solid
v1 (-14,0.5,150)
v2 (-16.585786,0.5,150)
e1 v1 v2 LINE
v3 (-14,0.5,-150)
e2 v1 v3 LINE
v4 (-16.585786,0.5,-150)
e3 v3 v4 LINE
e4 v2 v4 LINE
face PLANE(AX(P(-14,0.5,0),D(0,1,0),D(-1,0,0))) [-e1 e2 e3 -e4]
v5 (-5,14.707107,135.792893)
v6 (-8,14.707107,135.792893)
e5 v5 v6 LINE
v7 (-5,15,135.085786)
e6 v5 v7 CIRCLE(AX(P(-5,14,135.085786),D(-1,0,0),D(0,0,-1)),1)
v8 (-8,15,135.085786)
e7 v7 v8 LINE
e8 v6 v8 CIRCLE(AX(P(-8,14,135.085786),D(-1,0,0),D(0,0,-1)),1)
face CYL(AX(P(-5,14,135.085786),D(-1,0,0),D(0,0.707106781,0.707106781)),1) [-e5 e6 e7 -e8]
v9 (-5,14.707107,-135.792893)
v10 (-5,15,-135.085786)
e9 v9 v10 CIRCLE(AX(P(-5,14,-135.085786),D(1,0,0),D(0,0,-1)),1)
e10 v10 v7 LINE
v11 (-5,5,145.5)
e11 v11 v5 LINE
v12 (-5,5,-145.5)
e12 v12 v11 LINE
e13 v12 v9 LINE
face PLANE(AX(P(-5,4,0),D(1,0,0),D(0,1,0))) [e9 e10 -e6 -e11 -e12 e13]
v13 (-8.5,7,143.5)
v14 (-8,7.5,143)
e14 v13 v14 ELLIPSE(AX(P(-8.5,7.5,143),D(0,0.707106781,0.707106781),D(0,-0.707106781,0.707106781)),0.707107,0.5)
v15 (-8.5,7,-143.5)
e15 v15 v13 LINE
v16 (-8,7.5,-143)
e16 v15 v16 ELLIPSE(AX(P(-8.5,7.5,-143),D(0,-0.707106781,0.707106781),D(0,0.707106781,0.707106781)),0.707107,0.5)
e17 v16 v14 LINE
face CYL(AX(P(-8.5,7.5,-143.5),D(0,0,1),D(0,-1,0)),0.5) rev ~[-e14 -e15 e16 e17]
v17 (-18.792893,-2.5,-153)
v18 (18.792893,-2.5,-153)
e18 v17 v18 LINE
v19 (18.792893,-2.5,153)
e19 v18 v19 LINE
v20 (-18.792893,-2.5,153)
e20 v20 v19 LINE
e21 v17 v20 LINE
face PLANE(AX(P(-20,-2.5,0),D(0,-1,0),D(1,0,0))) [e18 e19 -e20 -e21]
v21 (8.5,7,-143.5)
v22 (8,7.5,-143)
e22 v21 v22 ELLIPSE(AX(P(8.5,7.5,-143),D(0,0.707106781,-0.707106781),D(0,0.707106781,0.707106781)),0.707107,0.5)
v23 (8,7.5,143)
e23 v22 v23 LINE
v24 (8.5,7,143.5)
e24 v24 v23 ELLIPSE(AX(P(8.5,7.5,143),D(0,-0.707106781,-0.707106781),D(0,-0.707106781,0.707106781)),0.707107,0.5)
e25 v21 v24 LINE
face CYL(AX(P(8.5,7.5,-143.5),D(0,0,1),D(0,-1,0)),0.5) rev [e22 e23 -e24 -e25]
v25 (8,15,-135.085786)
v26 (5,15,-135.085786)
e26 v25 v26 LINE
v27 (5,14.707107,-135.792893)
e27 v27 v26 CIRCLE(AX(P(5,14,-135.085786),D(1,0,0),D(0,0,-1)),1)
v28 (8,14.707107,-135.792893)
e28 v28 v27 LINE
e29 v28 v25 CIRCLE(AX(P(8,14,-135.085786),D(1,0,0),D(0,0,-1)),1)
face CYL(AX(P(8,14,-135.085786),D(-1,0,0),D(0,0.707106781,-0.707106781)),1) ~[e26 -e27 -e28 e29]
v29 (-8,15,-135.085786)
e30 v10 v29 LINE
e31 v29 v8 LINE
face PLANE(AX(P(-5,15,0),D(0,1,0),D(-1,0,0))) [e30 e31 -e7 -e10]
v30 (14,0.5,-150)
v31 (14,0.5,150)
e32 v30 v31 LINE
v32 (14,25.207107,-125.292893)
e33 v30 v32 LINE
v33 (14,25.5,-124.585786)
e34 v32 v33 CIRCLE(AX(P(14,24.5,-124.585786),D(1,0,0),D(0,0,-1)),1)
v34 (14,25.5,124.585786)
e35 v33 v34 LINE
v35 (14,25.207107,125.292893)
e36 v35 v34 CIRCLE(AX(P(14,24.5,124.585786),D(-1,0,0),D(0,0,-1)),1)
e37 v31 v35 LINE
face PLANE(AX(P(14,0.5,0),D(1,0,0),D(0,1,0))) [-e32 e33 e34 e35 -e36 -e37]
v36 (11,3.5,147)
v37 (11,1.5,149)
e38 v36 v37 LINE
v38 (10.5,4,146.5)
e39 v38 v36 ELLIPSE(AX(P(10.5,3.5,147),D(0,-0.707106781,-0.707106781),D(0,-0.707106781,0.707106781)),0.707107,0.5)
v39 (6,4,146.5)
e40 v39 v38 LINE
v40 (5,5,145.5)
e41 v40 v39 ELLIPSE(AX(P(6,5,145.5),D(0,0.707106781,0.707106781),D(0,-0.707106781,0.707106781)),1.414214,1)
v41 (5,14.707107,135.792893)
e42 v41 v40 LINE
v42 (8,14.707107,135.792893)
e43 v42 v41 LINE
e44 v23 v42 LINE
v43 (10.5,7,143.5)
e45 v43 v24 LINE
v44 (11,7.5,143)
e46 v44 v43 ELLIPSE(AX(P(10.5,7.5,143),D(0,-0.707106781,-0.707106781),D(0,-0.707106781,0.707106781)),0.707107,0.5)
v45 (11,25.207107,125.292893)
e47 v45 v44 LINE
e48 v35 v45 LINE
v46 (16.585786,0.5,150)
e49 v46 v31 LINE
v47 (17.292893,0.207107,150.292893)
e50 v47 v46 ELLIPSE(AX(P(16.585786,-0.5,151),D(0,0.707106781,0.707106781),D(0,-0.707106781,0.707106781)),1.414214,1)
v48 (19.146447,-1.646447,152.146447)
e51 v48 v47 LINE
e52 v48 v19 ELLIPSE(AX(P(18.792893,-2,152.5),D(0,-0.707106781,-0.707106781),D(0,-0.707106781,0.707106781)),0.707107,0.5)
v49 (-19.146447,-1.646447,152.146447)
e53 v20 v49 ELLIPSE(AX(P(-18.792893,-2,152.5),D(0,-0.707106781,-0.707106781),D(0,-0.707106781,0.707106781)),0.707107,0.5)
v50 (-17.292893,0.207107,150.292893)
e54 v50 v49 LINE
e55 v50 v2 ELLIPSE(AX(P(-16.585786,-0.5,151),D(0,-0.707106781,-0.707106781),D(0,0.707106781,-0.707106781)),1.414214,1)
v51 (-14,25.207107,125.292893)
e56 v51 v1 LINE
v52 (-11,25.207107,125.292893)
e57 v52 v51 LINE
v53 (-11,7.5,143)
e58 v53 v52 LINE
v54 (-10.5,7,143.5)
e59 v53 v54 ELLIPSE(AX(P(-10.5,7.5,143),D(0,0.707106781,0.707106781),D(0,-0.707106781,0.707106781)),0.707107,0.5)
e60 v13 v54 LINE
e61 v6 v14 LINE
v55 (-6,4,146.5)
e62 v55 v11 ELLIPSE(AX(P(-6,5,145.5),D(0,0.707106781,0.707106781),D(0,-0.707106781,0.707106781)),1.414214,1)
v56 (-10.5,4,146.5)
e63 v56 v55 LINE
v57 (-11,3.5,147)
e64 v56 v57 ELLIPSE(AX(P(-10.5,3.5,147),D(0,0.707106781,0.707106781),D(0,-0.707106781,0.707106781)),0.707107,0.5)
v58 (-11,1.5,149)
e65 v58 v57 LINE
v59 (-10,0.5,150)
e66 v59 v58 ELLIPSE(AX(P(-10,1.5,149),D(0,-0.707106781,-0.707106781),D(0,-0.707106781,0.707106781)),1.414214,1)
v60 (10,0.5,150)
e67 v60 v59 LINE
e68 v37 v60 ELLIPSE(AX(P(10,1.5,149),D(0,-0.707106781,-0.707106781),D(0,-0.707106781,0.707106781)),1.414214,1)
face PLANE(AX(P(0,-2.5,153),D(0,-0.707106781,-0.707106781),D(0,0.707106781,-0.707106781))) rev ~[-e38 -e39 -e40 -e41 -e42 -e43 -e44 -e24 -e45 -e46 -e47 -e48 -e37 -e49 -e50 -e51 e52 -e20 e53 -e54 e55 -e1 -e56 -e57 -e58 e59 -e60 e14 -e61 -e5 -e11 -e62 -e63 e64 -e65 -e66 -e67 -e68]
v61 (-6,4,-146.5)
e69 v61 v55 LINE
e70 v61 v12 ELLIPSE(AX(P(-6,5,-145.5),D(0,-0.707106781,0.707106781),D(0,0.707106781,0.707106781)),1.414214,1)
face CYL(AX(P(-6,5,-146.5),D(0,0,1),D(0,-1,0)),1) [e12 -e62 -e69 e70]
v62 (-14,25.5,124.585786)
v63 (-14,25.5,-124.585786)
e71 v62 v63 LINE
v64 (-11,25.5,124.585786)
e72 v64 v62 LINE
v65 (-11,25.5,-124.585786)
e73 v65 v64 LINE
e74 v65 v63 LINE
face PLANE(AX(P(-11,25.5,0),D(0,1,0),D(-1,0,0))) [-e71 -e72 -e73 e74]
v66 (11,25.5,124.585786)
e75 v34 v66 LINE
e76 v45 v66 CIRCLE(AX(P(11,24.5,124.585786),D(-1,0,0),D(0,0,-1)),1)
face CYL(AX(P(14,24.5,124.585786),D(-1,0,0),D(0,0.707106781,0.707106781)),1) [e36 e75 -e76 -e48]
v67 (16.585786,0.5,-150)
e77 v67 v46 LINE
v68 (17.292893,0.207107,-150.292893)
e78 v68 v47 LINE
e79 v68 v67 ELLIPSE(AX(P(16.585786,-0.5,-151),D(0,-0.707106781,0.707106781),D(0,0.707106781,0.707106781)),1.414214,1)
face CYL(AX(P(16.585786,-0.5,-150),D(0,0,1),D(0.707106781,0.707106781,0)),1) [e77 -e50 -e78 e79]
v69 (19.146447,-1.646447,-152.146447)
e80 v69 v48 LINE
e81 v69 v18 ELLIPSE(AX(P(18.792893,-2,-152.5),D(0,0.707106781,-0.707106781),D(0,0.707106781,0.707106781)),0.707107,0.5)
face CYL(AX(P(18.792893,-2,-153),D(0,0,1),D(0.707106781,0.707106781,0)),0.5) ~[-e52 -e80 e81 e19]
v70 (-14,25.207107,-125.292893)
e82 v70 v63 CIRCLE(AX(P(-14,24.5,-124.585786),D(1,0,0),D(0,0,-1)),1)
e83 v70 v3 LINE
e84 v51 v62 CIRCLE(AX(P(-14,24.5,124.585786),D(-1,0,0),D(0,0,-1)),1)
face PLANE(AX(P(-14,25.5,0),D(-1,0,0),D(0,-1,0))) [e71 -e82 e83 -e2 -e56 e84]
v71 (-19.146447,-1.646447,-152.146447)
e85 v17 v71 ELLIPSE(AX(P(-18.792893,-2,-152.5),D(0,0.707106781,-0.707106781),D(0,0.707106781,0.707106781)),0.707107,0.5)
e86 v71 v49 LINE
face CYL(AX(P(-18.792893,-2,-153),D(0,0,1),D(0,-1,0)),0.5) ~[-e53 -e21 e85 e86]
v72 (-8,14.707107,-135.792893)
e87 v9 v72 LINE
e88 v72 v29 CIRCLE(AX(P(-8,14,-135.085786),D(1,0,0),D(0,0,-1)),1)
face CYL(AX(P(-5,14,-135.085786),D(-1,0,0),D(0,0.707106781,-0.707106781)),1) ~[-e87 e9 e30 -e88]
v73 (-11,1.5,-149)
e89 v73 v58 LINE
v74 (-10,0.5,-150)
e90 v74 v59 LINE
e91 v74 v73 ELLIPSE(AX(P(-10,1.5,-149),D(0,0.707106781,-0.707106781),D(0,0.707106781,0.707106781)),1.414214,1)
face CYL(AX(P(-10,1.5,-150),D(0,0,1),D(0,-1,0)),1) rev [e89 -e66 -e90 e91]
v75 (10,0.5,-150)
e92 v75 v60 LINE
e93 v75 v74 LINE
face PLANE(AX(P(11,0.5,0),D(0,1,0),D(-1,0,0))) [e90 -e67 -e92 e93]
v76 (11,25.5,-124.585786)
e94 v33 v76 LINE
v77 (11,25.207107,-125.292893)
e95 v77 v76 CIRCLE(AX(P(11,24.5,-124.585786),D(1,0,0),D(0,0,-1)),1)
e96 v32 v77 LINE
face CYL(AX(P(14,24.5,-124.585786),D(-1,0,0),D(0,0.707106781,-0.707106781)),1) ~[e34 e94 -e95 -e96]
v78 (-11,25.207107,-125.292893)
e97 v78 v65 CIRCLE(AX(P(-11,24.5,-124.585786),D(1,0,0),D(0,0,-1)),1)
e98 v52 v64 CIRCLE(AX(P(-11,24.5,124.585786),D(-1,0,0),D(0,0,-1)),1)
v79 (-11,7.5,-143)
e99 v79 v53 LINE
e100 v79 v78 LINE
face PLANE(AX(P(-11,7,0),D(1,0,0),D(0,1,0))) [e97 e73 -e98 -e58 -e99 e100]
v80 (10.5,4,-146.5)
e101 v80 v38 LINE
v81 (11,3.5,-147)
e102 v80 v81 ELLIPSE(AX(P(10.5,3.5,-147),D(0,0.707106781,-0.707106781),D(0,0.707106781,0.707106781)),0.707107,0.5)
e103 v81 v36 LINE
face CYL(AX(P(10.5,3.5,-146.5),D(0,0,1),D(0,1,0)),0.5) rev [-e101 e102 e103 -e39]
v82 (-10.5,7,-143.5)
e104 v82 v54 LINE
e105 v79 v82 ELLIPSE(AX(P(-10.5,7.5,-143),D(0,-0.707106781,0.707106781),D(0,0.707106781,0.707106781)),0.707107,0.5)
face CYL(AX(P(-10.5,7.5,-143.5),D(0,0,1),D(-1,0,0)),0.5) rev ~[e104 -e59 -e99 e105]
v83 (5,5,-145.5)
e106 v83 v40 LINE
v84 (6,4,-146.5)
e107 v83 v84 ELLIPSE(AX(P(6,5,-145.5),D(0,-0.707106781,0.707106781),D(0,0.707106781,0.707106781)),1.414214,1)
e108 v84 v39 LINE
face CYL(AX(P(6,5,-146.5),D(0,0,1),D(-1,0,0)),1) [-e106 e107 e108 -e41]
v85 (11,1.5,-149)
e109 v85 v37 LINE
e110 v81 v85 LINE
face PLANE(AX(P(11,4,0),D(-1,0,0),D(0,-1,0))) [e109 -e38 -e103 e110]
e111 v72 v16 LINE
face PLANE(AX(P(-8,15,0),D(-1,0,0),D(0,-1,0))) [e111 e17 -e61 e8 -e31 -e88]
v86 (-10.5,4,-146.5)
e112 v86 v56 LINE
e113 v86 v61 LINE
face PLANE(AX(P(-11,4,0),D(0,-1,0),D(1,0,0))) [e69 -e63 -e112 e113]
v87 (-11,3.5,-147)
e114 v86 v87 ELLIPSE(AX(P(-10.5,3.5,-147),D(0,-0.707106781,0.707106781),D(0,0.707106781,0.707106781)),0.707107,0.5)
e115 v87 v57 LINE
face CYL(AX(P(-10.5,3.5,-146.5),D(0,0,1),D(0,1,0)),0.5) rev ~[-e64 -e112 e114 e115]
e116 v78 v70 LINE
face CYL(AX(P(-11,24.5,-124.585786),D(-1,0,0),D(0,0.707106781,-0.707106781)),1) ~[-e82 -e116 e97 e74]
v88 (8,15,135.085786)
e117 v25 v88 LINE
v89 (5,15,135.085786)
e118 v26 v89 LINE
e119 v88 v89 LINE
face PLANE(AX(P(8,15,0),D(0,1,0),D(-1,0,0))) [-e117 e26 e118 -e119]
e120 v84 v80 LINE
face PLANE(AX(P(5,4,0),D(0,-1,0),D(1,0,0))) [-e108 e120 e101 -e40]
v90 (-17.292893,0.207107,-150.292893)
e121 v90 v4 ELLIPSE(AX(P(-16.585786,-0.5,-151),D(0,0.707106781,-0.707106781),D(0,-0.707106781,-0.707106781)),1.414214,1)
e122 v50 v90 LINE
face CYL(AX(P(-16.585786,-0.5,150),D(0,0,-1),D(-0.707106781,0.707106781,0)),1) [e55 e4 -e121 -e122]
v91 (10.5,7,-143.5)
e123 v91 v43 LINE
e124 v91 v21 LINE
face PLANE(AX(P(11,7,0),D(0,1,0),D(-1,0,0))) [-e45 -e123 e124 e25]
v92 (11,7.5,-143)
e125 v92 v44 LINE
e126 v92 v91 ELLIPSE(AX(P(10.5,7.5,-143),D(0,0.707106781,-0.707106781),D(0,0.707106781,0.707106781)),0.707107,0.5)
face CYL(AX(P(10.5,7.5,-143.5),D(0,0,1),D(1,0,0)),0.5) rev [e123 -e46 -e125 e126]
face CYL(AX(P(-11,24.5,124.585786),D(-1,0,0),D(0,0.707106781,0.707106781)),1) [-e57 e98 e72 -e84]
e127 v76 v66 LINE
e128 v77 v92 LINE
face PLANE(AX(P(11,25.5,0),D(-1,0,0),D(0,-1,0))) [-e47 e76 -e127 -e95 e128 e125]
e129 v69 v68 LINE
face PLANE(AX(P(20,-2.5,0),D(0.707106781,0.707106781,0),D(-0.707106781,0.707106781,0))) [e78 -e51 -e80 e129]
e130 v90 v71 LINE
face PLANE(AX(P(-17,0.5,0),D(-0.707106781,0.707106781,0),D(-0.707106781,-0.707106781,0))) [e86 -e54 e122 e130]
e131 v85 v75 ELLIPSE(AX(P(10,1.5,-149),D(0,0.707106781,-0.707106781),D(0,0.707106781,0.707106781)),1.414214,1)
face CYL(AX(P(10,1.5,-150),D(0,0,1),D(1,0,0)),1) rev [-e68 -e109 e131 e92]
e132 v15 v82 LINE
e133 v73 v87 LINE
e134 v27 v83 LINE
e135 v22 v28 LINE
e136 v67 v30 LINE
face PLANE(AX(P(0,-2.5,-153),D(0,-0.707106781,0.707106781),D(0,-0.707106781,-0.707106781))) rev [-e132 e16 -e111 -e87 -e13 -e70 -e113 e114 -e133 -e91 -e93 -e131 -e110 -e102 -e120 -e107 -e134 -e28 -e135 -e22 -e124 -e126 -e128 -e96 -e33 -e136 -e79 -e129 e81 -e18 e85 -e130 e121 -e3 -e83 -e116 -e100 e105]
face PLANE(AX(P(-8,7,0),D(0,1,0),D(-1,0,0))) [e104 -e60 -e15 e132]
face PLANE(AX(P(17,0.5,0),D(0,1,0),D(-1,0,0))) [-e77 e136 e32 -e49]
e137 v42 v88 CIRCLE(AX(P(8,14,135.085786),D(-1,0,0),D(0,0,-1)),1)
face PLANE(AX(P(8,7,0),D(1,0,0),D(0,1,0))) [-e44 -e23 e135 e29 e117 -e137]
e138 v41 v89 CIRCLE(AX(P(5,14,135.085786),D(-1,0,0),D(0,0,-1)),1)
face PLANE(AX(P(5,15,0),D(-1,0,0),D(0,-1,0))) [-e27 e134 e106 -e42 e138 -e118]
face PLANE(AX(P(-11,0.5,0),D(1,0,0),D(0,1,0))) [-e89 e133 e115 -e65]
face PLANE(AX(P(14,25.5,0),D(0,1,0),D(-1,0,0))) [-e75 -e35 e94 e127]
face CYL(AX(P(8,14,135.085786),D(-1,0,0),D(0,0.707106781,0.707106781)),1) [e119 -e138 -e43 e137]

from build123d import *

# Parameters (mm, degrees)
F1_DEPTH = 153
F3_DEPTH = 30
F4_R     = 1
F6_R     = 0.5
F7_R     = 0.5


# Not quite as in the source:
# - two fillets or chamfers of one size are made in one step
# - a pattern or mirror of a feature is missing from the dataset's text; its kind, count and spacing are read off the source's solid


with BuildPart() as f1:
    # F0 (on Top) → F1 (new body, symmetric)
    with BuildSketch(Plane.XY):
        Polygon((-14, 0.5), (-17, 0.5), (-20, -2.5), (20, -2.5), (17, 0.5), (14, 0.5), (11, 0.5), (-11, 0.5), align=None)
        Polygon((-14, 25.5), (-14, 0.5), (-11, 0.5), (-11, 4), (-11, 7), (-11, 25.5), align=None)
        Polygon((11, 4), (11, 0.5), (14, 0.5), (14, 25.5), (11, 25.5), (11, 7), align=None)
        Polygon((-11, 7), (-11, 4), (-5, 4), (-5, 7), (-5, 15), (-8, 15), (-8, 7), align=None)
        Polygon((5, 4), (11, 4), (11, 7), (8, 7), (8, 15), (5, 15), (5, 7), align=None)
    extrude(amount=F1_DEPTH, both=True)

    # F2 (on Right) → F3 (cut, symmetric)
    with BuildSketch(Plane.YZ):
        Polygon((25.5, 153), (0.5, 153), (-2.5, 153), (25.5, 125), align=None)
    f3 = extrude(amount=F3_DEPTH, both=True, mode=Mode.SUBTRACT)

    # F3_copies: F3 across plane
    add(f3.mirror(Plane(origin=(0, 0, 0), x_dir=(-1, 0, 0), z_dir=(0, 0, -1))), mode=Mode.SUBTRACT)

    # F4
    f4_edges = [f1.edges().sort_by_distance(p)[0] for p in [
        (17, 0.5, 0),
        (12.5, 25.5, 125),
        (-11, 0.5, 0),
        (-12.5, 25.5, 125),
        (-17, 0.5, 0),
        (11, 0.5, 0),
        (6.5, 15, 135.5),
        (-6.5, 15, 135.5),
        (12.5, 25.5, -125),
        (6.5, 15, -135.5),
        (-6.5, 15, -135.5),
        (-12.5, 25.5, -125),
        (5, 4, 0),
        (-5, 4, 0),
    ]]
    fillet(f4_edges, radius=F4_R)

    # F6
    f6_edges = [f1.edges().sort_by_distance(p)[0] for p in [
        (-8, 7, 0),
        (-11, 7, 0),
        (-11, 4, 0),
        (11, 4, 0),
        (11, 7, 0),
        (8, 7, 0),
    ]]
    fillet(f6_edges, radius=F6_R)

    # F7
    f7_edges = [f1.edges().sort_by_distance(p)[0] for p in [
        (20, -2.5, 0),
        (-20, -2.5, 0),
    ]]
    fillet(f7_edges, radius=F7_R)


solid = f1.part
